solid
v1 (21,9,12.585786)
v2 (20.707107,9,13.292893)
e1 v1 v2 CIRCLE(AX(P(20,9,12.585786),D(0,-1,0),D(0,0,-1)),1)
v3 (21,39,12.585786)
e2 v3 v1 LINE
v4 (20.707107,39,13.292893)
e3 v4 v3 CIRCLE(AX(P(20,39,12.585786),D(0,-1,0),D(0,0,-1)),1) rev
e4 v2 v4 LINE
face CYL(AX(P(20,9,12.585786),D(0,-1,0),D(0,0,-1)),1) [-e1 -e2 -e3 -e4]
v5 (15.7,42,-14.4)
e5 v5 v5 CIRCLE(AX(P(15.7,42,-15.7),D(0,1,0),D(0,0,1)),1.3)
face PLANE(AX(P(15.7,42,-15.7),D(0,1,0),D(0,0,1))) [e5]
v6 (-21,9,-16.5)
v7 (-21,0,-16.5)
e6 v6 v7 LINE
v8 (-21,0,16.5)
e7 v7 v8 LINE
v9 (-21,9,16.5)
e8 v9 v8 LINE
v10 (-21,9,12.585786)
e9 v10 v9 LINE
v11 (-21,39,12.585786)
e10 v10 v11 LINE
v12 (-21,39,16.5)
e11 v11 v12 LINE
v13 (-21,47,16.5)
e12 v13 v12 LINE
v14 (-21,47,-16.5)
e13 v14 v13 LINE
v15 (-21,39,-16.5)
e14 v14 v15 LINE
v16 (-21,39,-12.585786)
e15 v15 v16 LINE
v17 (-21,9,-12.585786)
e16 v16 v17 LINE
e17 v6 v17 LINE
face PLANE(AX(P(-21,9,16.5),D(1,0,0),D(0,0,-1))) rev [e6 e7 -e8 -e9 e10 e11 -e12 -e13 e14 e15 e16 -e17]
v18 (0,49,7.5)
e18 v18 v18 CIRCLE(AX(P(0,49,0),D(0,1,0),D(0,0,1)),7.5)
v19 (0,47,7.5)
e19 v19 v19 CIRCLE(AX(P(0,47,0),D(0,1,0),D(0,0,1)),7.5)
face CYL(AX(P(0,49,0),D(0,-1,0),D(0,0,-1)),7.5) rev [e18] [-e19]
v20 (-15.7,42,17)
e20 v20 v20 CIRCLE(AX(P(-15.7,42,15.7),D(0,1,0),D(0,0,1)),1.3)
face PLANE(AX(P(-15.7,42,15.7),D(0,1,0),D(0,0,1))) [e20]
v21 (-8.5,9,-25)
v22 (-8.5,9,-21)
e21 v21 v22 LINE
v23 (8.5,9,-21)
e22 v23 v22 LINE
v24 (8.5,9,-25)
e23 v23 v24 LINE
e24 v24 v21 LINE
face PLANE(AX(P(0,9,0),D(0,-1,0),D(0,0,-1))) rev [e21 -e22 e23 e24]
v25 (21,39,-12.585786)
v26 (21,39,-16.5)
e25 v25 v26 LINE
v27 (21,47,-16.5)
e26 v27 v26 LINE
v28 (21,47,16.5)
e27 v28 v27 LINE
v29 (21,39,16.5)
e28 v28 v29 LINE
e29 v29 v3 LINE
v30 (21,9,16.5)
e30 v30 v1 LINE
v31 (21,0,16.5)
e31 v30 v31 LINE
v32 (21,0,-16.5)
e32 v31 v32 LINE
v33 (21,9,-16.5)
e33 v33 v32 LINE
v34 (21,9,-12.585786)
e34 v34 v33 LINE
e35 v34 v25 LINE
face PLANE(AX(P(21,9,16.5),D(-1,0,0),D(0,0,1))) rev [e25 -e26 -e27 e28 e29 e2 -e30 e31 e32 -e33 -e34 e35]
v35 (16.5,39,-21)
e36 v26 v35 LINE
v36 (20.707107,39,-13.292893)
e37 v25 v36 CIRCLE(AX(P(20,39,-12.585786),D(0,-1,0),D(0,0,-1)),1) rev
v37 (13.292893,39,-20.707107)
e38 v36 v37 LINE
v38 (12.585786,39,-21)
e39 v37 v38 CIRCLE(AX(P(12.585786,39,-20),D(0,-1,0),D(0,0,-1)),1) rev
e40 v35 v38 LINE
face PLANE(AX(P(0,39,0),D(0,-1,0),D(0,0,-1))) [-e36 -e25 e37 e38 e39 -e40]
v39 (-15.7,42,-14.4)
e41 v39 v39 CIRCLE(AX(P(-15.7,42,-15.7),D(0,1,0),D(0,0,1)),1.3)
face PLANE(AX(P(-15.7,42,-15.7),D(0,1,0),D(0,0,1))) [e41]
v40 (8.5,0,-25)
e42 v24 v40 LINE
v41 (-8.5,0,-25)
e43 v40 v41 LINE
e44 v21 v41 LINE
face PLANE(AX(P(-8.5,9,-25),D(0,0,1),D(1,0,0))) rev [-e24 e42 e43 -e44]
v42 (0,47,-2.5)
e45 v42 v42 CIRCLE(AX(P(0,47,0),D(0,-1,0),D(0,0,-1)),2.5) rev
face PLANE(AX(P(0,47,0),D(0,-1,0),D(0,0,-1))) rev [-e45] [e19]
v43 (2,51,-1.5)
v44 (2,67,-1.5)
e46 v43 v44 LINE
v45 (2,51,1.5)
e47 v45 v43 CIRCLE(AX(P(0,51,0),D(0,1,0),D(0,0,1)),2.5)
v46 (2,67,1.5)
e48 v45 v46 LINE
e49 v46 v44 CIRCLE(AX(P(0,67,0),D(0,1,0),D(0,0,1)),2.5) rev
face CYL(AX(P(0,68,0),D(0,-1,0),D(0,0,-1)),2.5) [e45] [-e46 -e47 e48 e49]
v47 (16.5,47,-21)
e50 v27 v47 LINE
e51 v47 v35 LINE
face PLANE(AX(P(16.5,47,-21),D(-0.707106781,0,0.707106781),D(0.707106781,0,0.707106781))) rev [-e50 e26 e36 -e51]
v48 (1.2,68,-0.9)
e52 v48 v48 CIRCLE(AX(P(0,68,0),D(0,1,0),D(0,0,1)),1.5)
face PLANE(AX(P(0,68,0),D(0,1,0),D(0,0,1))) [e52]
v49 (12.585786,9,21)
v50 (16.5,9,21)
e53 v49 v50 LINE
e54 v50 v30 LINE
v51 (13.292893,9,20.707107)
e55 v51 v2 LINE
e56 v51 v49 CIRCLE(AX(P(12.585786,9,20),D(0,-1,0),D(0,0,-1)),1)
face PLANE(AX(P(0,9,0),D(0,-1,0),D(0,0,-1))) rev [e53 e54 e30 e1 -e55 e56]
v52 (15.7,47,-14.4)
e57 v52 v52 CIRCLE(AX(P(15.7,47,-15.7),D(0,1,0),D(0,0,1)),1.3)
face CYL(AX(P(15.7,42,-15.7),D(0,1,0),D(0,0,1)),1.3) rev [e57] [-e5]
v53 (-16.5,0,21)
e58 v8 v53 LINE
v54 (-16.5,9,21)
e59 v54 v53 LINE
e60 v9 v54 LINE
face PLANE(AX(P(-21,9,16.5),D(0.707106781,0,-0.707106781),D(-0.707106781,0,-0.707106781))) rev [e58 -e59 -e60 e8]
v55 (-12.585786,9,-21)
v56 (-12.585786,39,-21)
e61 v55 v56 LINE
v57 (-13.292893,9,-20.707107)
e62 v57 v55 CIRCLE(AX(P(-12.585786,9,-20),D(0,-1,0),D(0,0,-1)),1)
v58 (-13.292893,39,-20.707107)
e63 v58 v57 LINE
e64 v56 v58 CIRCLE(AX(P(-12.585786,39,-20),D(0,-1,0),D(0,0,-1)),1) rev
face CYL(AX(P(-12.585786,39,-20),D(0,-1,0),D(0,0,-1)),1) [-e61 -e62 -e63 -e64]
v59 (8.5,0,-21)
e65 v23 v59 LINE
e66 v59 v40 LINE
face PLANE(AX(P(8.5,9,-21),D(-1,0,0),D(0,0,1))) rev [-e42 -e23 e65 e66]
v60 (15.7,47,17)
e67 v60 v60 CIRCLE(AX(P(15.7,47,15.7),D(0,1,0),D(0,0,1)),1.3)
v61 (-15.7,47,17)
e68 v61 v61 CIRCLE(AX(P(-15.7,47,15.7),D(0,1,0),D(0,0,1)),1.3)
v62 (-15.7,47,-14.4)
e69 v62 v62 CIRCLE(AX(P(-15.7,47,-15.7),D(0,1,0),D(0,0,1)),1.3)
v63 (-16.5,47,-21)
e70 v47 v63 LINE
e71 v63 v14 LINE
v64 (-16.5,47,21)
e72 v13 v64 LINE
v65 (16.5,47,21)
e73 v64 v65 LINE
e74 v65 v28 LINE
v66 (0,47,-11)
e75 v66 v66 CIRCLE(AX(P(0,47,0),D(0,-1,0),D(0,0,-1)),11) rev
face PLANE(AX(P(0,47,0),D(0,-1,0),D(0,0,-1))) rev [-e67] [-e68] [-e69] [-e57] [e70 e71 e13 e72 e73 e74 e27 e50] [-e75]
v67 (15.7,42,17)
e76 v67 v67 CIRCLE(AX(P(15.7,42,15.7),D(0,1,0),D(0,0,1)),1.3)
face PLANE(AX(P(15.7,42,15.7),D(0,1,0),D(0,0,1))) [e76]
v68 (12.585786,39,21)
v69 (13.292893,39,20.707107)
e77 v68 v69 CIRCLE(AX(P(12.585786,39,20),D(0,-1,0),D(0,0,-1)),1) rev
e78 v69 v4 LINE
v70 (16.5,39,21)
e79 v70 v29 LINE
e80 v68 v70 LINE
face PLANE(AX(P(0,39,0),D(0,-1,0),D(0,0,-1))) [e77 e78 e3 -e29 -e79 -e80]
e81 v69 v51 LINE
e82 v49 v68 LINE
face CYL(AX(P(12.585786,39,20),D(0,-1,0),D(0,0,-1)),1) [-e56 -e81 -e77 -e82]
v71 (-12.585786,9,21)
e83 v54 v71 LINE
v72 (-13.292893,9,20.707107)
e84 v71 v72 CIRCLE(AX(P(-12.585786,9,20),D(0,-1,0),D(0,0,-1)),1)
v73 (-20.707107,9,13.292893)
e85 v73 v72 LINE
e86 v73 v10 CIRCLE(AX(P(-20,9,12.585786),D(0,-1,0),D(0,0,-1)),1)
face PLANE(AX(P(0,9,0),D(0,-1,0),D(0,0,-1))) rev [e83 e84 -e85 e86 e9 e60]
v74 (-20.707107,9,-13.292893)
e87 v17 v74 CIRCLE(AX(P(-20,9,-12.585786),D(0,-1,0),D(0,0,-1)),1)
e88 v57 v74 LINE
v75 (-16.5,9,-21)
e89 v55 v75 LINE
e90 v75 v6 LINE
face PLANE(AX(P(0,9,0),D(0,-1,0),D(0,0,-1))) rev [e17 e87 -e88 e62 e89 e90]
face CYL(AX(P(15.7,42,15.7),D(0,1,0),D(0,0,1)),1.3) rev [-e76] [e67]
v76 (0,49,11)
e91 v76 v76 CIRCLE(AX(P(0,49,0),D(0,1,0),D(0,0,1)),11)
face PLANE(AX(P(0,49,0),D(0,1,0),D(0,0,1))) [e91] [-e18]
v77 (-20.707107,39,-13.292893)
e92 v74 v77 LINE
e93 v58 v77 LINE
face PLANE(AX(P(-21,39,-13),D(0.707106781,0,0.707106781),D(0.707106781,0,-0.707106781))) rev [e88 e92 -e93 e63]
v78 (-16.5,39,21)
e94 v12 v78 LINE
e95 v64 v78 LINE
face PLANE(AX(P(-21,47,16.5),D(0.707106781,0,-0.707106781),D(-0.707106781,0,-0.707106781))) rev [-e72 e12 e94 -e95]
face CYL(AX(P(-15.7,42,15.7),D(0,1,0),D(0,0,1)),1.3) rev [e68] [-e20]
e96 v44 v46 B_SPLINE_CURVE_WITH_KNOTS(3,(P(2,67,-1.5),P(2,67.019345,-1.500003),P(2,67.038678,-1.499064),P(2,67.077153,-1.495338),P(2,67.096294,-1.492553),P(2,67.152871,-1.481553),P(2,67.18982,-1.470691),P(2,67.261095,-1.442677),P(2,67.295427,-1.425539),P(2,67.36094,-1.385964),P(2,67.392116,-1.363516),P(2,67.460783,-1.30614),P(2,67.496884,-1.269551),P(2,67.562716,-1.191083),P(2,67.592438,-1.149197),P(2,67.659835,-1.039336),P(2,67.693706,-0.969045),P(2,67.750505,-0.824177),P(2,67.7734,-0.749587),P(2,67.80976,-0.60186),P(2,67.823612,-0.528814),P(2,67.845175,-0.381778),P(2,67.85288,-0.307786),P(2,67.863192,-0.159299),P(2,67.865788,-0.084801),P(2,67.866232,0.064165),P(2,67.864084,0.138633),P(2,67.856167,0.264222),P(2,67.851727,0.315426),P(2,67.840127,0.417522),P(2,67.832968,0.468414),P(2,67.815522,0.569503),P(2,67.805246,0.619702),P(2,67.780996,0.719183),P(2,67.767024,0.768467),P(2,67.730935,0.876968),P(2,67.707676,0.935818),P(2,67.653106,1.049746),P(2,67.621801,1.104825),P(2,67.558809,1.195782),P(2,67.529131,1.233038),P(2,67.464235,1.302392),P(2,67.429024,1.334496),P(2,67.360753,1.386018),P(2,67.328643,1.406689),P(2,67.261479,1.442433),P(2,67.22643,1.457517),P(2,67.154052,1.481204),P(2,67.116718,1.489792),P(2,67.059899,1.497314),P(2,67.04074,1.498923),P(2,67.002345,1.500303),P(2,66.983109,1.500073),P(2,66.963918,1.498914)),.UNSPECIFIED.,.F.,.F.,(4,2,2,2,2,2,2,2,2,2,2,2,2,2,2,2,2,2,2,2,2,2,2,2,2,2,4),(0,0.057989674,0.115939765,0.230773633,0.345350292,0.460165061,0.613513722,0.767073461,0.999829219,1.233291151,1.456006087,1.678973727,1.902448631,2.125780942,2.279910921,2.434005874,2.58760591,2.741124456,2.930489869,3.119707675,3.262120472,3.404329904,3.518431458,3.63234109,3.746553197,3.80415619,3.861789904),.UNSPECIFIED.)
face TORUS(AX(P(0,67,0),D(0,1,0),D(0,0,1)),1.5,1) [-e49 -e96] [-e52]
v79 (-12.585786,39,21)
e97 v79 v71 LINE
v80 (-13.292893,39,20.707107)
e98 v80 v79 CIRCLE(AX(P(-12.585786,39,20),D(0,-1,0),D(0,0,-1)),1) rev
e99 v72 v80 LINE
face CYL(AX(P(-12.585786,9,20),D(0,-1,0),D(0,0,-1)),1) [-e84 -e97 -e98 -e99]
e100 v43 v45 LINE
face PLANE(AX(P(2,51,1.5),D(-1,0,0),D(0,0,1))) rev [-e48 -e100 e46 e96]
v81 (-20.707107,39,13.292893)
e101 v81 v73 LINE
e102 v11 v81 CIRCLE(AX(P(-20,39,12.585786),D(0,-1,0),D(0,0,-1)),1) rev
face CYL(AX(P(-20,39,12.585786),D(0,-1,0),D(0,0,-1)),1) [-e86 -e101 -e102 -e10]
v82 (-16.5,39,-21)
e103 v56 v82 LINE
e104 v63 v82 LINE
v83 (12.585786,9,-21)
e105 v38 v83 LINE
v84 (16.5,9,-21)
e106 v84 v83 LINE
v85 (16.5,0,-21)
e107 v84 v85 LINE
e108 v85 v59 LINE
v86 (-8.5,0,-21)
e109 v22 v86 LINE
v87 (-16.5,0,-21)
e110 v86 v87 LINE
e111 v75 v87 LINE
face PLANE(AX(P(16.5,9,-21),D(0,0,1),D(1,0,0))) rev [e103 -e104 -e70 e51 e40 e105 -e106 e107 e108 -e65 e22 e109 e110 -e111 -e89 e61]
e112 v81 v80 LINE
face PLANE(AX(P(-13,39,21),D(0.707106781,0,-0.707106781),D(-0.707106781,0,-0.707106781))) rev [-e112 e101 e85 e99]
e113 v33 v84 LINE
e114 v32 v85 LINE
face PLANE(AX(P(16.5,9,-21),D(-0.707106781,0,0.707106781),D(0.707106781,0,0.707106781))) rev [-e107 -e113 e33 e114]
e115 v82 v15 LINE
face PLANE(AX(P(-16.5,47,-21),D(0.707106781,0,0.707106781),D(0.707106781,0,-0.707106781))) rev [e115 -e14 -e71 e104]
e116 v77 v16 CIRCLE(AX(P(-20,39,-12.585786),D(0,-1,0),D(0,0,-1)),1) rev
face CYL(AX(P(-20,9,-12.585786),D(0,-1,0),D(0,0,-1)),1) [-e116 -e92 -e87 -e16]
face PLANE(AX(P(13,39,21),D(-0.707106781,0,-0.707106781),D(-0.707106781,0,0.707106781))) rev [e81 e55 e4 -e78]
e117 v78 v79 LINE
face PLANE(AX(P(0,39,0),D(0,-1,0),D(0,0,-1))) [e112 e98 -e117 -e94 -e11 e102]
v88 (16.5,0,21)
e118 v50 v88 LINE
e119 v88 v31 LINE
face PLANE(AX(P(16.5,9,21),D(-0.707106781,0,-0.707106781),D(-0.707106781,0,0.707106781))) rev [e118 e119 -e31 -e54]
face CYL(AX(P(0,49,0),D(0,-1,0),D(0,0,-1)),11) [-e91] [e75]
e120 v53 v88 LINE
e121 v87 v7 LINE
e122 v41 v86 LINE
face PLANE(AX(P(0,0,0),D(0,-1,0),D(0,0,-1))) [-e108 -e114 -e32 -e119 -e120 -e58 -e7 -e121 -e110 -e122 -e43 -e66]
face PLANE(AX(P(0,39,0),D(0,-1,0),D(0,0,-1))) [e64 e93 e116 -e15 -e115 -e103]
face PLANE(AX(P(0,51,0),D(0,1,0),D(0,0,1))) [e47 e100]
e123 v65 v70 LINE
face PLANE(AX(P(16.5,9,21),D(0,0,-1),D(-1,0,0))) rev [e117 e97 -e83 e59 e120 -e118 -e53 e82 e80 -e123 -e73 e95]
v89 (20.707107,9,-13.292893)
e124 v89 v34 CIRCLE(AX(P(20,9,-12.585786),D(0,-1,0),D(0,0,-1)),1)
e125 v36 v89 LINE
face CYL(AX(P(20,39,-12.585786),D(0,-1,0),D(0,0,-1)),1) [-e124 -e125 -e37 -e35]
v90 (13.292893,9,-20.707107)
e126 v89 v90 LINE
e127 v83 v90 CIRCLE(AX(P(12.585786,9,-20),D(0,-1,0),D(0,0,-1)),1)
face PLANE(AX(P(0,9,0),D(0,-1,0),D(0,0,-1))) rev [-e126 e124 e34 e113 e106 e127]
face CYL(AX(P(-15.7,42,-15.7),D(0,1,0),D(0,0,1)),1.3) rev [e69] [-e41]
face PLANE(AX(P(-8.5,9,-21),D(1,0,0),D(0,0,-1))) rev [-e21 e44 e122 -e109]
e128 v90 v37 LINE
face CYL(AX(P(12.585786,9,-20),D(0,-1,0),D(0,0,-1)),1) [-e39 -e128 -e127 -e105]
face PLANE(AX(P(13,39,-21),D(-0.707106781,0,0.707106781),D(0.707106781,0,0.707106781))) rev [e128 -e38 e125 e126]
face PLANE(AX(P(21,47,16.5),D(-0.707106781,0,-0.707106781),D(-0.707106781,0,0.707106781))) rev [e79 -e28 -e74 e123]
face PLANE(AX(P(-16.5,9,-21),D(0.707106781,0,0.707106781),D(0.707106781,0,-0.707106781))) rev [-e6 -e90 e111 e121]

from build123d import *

# Parameters (mm, degrees)
SALIENTE_EXTRUIR1_DEPTH = 9
SALIENTE_EXTRUIR2_START = 9
SALIENTE_EXTRUIR2_DEPTH = 30
REDONDEO3_R             = 1
SALIENTE_EXTRUIR3_START = 39
SALIENTE_EXTRUIR3_DEPTH = 8
CORTAR_EXTRUIR1_START   = 47
CROQUIS4_R              = 1.3
CORTAR_EXTRUIR1_DEPTH   = 5
SALIENTE_EXTRUIR4_START = 47
CROQUIS5_R              = 11
CROQUIS5_R_2            = 7.5
SALIENTE_EXTRUIR4_DEPTH = 2
SALIENTE_EXTRUIR5_START = 47
CROQUIS6_R              = 2.5
SALIENTE_EXTRUIR5_DEPTH = 21
CORTAR_EXTRUIR2_START   = 51
CORTAR_EXTRUIR2_DEPTH   = 17
REDONDEO4_R             = 1


with BuildPart() as part:
    # Croquis1 → Saliente-Extruir1 (new body)
    with BuildSketch(Plane(origin=(0, 0, 0), x_dir=(1, 0, 0), z_dir=(0, 1, 0))):
        Polygon((-16.5, 21), (-21, 16.5), (-21, -16.5), (-16.5, -21), (16.5, -21), (21, -16.5), (21, 16.5), (16.5, 21), (8.5, 21), (8.5, 25), (-8.5, 25), (-8.5, 21), align=None)
    extrude(amount=SALIENTE_EXTRUIR1_DEPTH)

    # Croquis2 → Saliente-Extruir2 (add)
    with BuildSketch(Plane(origin=(0, 0, 0), x_dir=(1, 0, 0), z_dir=(0, 1, 0)).offset(SALIENTE_EXTRUIR2_START)):
        Polygon((13, 21), (21, 13), (21, -13), (13, -21), (-13, -21), (-21, -13), (-21, 13), (-13, 21), align=None)
    extrude(amount=SALIENTE_EXTRUIR2_DEPTH)

    # Redondeo3
    redondeo3_edges = [part.edges().sort_by_distance(p)[0] for p in [
        (13, 24, -21),
        (-13, 24, -21),
        (-21, 24, -13),
        (-21, 24, 13),
        (-13, 24, 21),
        (13, 24, 21),
        (21, 24, 13),
        (21, 24, -13),
    ]]
    fillet(redondeo3_edges, radius=REDONDEO3_R)

    # Croquis3 → Saliente-Extruir3 (add)
    with BuildSketch(Plane(origin=(0, 0, 0), x_dir=(1, 0, 0), z_dir=(0, 1, 0)).offset(SALIENTE_EXTRUIR3_START)):
        Polygon((-16.5, 21), (-21, 16.5), (-21, -16.5), (-16.5, -21), (16.5, -21), (21, -16.5), (21, 16.5), (16.5, 21), align=None)
    extrude(amount=SALIENTE_EXTRUIR3_DEPTH)

    # Croquis4 → Cortar-Extruir1 (cut)
    with BuildSketch(Plane(origin=(0, 0, 0), x_dir=(1, 0, 0), z_dir=(0, 1, 0)).offset(CORTAR_EXTRUIR1_START)):
        with Locations(Location((-15.7, 15.7, 0), (0, 0, 270))):
            Circle(CROQUIS4_R)
        with Locations(Location((15.7, 15.7, 0), (0, 0, 270))):
            Circle(CROQUIS4_R)
        with Locations(Location((15.7, -15.7, 0), (0, 0, 270))):
            Circle(CROQUIS4_R)
        with Locations(Location((-15.7, -15.7, 0), (0, 0, 270))):
            Circle(CROQUIS4_R)
    extrude(amount=-CORTAR_EXTRUIR1_DEPTH, mode=Mode.SUBTRACT)

    # Croquis5 → Saliente-Extruir4 (add)
    with BuildSketch(Plane(origin=(0, 0, 0), x_dir=(1, 0, 0), z_dir=(0, 1, 0)).offset(SALIENTE_EXTRUIR4_START)):
        with Locations(Location((0, 0, 0), (0, 0, 90))):
            Circle(CROQUIS5_R)
        with Locations(Location((0, 0, 0), (0, 0, 270))):
            Circle(CROQUIS5_R_2, mode=Mode.SUBTRACT)
    extrude(amount=SALIENTE_EXTRUIR4_DEPTH)

    # Croquis6 → Saliente-Extruir5 (add)
    with BuildSketch(Plane(origin=(0, 0, 0), x_dir=(1, 0, 0), z_dir=(0, 1, 0)).offset(SALIENTE_EXTRUIR5_START)):
        with Locations(Location((0, 0, 0), (0, 0, 90))):
            Circle(CROQUIS6_R)
    extrude(amount=SALIENTE_EXTRUIR5_DEPTH)

    # Croquis7 → Cortar-Extruir2 (cut)
    with BuildSketch(Plane(origin=(0, 0, 0), x_dir=(1, 0, 0), z_dir=(0, 1, 0)).offset(CORTAR_EXTRUIR2_START)):
        with BuildLine():
            Line((2, -1.5), (2, 1.5))
            ThreePointArc((2, 1.5), (2.5, 0), (2, -1.5))
        make_face()
    extrude(amount=CORTAR_EXTRUIR2_DEPTH, mode=Mode.SUBTRACT)

    # Redondeo4
    # the kernel refuses this fillet: 1 mm, written as the material it takes off along each edge
    with BuildSketch(Plane(origin=(0, 68, 0), x_dir=(0, 0, -1), z_dir=(1, 0, 0))) as redondeo4_piece_1:
        with BuildLine():
            CenterArc((2.5 - REDONDEO4_R, -REDONDEO4_R), REDONDEO4_R, 0, 90)
            Line((2.5 - REDONDEO4_R, 0), (2.5, 0))
            Line((2.5, 0), (2.5, -REDONDEO4_R))
        make_face()
    revolve(axis=Axis((0, 68, 0), (0, 1, 0)), revolution_arc=290.580564901, mode=Mode.SUBTRACT)
    with BuildSketch(Plane(origin=(0, 68, 0), x_dir=(0.9370755783657725, 0, 0.34912656792408847), z_dir=(-0.34912656792408847, 0, 0.9370755783657725))) as redondeo4_piece_2:
        with BuildLine():
            CenterArc((2.5 - REDONDEO4_R, -REDONDEO4_R), REDONDEO4_R, 0, 90)
            Line((2.5 - REDONDEO4_R, 0), (2.5, 0))
            Line((2.5, 0), (2.5, -REDONDEO4_R))
        make_face()
    revolve(axis=Axis((0, 68, 0), (0, 1, 0)), revolution_arc=110.433901418, mode=Mode.SUBTRACT)


solid = part.part
